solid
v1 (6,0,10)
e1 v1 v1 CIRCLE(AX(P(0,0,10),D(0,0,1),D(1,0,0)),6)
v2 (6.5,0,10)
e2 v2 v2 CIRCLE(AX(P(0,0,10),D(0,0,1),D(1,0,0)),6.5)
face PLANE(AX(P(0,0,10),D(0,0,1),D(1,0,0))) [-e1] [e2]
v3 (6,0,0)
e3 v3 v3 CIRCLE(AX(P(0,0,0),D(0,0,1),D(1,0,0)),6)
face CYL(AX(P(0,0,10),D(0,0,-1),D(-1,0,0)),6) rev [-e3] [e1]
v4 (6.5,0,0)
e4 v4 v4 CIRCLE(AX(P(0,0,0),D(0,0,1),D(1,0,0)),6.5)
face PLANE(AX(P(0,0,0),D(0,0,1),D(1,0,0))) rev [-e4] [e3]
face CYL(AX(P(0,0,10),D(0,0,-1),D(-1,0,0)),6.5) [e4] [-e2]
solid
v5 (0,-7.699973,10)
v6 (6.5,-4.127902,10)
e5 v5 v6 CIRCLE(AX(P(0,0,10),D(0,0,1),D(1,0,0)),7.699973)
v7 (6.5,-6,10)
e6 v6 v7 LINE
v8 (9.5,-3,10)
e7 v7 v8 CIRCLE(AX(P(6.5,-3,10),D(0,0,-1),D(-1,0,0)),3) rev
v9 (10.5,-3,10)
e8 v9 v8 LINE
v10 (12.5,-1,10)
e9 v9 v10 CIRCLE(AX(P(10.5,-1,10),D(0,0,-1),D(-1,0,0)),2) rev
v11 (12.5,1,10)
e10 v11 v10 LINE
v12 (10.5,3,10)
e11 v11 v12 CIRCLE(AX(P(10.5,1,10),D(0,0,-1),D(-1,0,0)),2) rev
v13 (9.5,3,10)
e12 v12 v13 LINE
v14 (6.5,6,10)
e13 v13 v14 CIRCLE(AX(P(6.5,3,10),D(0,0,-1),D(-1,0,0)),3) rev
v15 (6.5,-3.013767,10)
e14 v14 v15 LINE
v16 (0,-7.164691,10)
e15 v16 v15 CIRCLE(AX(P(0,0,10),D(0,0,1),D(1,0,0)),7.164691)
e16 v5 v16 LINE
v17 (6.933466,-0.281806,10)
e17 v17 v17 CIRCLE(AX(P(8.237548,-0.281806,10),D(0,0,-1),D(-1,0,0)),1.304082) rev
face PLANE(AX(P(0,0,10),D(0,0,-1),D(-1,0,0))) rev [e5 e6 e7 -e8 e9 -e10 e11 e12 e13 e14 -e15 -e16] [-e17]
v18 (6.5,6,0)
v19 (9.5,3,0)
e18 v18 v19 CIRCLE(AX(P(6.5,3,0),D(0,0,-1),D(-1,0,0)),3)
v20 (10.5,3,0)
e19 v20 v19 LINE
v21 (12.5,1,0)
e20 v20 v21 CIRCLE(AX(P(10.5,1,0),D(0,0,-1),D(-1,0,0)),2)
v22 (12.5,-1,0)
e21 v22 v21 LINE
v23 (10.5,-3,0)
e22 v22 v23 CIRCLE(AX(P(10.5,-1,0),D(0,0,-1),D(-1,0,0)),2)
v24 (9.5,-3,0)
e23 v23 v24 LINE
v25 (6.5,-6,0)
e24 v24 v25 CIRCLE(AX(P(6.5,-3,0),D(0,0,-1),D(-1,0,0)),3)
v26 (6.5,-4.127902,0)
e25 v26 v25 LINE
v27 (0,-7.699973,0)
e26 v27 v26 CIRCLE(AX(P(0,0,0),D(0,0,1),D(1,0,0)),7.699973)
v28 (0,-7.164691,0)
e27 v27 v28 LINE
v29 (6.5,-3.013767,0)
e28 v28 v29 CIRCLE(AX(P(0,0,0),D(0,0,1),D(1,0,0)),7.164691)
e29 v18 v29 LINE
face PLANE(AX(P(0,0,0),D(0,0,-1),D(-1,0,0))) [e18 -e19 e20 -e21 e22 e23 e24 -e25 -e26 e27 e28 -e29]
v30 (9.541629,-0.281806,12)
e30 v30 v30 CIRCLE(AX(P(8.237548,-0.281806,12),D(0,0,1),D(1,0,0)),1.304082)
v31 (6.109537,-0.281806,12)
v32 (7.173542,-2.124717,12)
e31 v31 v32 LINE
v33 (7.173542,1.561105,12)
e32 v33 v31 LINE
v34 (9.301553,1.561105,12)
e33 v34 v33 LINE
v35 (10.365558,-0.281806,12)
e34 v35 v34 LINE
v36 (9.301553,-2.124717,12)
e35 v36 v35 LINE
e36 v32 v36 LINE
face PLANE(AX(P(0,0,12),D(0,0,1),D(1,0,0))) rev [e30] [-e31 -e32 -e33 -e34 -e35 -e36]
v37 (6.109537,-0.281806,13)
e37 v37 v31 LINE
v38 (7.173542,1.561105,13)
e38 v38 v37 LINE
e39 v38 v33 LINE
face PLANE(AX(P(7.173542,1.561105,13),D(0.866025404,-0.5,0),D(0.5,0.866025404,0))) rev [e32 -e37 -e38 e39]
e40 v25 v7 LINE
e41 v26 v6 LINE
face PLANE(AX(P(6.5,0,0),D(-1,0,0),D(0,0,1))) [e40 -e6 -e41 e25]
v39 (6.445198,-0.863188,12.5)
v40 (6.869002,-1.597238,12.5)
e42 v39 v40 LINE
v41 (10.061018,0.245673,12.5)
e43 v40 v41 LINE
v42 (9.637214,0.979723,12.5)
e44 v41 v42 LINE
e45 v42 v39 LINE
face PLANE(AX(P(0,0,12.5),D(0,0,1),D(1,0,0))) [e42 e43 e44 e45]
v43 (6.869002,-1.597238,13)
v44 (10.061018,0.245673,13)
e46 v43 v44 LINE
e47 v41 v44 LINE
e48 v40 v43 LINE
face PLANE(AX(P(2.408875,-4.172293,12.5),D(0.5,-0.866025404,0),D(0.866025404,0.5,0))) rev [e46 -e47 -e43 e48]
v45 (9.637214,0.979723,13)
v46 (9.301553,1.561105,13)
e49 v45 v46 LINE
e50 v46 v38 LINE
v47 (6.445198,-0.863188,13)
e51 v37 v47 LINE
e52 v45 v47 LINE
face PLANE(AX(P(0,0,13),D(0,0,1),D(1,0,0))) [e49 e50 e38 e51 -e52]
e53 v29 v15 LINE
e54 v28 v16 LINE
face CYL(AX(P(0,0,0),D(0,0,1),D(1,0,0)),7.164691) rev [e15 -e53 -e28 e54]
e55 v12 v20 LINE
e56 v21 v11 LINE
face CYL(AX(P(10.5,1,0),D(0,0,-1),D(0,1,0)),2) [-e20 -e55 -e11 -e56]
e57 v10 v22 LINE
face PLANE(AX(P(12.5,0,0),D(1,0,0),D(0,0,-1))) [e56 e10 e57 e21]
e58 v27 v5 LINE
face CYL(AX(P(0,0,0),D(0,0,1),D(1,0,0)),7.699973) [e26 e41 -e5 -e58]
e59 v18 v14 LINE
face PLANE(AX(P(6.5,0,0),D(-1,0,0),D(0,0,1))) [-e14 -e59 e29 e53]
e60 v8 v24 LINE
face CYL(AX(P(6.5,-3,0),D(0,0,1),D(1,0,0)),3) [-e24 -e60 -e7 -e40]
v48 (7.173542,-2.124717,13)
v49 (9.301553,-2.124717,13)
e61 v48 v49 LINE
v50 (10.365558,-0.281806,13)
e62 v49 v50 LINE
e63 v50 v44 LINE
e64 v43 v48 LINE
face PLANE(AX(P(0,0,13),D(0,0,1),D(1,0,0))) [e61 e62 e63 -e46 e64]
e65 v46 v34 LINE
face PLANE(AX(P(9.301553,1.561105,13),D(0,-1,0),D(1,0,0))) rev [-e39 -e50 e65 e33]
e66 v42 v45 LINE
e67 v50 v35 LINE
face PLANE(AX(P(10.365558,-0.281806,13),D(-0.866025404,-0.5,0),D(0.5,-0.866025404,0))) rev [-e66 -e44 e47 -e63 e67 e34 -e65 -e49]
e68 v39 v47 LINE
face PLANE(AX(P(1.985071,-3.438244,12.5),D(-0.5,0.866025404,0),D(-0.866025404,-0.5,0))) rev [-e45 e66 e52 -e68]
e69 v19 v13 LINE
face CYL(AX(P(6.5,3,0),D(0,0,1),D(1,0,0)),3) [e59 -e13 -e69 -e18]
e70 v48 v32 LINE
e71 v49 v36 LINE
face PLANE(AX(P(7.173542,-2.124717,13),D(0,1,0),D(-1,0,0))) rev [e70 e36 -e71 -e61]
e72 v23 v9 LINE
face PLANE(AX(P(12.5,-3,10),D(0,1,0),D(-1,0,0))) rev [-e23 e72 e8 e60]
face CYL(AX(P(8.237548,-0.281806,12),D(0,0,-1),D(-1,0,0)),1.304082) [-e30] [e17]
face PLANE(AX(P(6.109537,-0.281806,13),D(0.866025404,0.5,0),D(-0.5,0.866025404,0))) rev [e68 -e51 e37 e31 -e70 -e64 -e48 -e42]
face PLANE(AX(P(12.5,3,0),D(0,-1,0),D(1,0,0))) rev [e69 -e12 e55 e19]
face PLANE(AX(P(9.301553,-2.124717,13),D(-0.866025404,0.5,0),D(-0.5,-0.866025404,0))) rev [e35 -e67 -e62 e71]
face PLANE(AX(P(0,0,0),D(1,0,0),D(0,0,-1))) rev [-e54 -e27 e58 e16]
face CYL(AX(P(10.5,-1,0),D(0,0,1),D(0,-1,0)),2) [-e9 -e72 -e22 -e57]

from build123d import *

# Parameters (mm, degrees)
ESBO_O1_R                = 6.5
ESBO_O1_R_2              = 6
RESSALTO_EXTRUS_O1_DEPTH = 10
RESSALTO_EXTRUS_O2_DEPTH = 10
RESSALTO_EXTRUS_O3_DEPTH = 3
FILETE1_R                = 2
FILETE2_R                = 3
ESBO_O4_R                = 1.304081641
RESSALTO_EXTRUS_O4_DEPTH = 2
RESSALTO_EXTRUS_O5_DEPTH = 1
CORTE_EXTRUS_O1_DEPTH    = 0.5
RESSALTO_EXTRUS_O6_DEPTH = 10


with BuildPart() as part:
    # Esboço1 → Ressalto-extrusão1 (new body)
    with BuildSketch(Plane.XY):
        Circle(ESBO_O1_R)
        Circle(ESBO_O1_R_2, mode=Mode.SUBTRACT)
    extrude(amount=RESSALTO_EXTRUS_O1_DEPTH)


with BuildPart() as body_2:
    # Esboço2 → Ressalto-extrusão2 (new body)
    with BuildSketch(Plane.XY.offset(10)):
        Polygon((6.5, 0), (6.5, 6), (9.5, 6), (9.5, -6), (6.5, -6), align=None)
    extrude(amount=-RESSALTO_EXTRUS_O2_DEPTH)

    # Esboço3 → Ressalto-extrusão3 (add)
    with BuildSketch(Plane(origin=(9.5, 0, 0), x_dir=(0, 0, -1), z_dir=(1, 0, 0))):
        Polygon((0, 0), (0, 3), (-10, 3), (-10, -3), (0, -3), align=None)
    extrude(amount=RESSALTO_EXTRUS_O3_DEPTH)

    # Filete1
    filete1_edges = [body_2.edges().sort_by_distance(p)[0] for p in [
        (12.5, -3, 5),
        (12.5, 3, 5),
    ]]
    fillet(filete1_edges, radius=FILETE1_R)

    # Filete2
    filete2_edges = [body_2.edges().sort_by_distance(p)[0] for p in [
        (9.5, -6, 5),
        (9.5, 6, 5),
    ]]
    fillet(filete2_edges, radius=FILETE2_R - 0.0001)  # a hair under: the kernel refuses the full size

    # Esboço4 → Ressalto-extrusão4 (add)
    with BuildSketch(Plane.XY.offset(10)):
        with Locations(Location((8.237547689, -0.281806099, 0), (0, 0, 180))):
            Circle(ESBO_O4_R)
    extrude(amount=RESSALTO_EXTRUS_O4_DEPTH)

    # Esboço5 → Ressalto-extrusão5 (add)
    with BuildSketch(Plane.XY.offset(12)):
        Polygon((10.365558356, -0.281806099), (9.301553023, 1.561105198), (7.173542356, 1.561105198), (6.109537022, -0.281806099), (7.173542356, -2.124717396), (9.301553023, -2.124717396), align=None)
    extrude(amount=RESSALTO_EXTRUS_O5_DEPTH)

    # Esboço6 → Corte-extrusão1 (cut)
    with BuildSketch(Plane.XY.offset(13)):
        Polygon((10.061017875, 0.245673487), (9.833555689, 0.63964955), (9.637214047, 0.979723249), (6.445198047, -0.863188048), (6.869001875, -1.59723781), align=None)
    extrude(amount=-CORTE_EXTRUS_O1_DEPTH, mode=Mode.SUBTRACT)

    # Esboço7 → Ressalto-extrusão6 (add)
    with BuildSketch(Plane.XY.offset(10)):
        with BuildLine():
            ThreePointArc((0, -7.699972578), (3.708425738, -6.748122424), (6.5, -4.127902337))
            Line((6.5, -4.127902337), (6.5, -3.013766987))
            ThreePointArc((6.5, -3.013766987), (3.856169306, -6.038439346), (0, -7.164690604))
            Line((0, -7.164690604), (0, -7.699972578))
        make_face()
    extrude(amount=-RESSALTO_EXTRUS_O6_DEPTH)


solid = Compound([part.part, body_2.part])
